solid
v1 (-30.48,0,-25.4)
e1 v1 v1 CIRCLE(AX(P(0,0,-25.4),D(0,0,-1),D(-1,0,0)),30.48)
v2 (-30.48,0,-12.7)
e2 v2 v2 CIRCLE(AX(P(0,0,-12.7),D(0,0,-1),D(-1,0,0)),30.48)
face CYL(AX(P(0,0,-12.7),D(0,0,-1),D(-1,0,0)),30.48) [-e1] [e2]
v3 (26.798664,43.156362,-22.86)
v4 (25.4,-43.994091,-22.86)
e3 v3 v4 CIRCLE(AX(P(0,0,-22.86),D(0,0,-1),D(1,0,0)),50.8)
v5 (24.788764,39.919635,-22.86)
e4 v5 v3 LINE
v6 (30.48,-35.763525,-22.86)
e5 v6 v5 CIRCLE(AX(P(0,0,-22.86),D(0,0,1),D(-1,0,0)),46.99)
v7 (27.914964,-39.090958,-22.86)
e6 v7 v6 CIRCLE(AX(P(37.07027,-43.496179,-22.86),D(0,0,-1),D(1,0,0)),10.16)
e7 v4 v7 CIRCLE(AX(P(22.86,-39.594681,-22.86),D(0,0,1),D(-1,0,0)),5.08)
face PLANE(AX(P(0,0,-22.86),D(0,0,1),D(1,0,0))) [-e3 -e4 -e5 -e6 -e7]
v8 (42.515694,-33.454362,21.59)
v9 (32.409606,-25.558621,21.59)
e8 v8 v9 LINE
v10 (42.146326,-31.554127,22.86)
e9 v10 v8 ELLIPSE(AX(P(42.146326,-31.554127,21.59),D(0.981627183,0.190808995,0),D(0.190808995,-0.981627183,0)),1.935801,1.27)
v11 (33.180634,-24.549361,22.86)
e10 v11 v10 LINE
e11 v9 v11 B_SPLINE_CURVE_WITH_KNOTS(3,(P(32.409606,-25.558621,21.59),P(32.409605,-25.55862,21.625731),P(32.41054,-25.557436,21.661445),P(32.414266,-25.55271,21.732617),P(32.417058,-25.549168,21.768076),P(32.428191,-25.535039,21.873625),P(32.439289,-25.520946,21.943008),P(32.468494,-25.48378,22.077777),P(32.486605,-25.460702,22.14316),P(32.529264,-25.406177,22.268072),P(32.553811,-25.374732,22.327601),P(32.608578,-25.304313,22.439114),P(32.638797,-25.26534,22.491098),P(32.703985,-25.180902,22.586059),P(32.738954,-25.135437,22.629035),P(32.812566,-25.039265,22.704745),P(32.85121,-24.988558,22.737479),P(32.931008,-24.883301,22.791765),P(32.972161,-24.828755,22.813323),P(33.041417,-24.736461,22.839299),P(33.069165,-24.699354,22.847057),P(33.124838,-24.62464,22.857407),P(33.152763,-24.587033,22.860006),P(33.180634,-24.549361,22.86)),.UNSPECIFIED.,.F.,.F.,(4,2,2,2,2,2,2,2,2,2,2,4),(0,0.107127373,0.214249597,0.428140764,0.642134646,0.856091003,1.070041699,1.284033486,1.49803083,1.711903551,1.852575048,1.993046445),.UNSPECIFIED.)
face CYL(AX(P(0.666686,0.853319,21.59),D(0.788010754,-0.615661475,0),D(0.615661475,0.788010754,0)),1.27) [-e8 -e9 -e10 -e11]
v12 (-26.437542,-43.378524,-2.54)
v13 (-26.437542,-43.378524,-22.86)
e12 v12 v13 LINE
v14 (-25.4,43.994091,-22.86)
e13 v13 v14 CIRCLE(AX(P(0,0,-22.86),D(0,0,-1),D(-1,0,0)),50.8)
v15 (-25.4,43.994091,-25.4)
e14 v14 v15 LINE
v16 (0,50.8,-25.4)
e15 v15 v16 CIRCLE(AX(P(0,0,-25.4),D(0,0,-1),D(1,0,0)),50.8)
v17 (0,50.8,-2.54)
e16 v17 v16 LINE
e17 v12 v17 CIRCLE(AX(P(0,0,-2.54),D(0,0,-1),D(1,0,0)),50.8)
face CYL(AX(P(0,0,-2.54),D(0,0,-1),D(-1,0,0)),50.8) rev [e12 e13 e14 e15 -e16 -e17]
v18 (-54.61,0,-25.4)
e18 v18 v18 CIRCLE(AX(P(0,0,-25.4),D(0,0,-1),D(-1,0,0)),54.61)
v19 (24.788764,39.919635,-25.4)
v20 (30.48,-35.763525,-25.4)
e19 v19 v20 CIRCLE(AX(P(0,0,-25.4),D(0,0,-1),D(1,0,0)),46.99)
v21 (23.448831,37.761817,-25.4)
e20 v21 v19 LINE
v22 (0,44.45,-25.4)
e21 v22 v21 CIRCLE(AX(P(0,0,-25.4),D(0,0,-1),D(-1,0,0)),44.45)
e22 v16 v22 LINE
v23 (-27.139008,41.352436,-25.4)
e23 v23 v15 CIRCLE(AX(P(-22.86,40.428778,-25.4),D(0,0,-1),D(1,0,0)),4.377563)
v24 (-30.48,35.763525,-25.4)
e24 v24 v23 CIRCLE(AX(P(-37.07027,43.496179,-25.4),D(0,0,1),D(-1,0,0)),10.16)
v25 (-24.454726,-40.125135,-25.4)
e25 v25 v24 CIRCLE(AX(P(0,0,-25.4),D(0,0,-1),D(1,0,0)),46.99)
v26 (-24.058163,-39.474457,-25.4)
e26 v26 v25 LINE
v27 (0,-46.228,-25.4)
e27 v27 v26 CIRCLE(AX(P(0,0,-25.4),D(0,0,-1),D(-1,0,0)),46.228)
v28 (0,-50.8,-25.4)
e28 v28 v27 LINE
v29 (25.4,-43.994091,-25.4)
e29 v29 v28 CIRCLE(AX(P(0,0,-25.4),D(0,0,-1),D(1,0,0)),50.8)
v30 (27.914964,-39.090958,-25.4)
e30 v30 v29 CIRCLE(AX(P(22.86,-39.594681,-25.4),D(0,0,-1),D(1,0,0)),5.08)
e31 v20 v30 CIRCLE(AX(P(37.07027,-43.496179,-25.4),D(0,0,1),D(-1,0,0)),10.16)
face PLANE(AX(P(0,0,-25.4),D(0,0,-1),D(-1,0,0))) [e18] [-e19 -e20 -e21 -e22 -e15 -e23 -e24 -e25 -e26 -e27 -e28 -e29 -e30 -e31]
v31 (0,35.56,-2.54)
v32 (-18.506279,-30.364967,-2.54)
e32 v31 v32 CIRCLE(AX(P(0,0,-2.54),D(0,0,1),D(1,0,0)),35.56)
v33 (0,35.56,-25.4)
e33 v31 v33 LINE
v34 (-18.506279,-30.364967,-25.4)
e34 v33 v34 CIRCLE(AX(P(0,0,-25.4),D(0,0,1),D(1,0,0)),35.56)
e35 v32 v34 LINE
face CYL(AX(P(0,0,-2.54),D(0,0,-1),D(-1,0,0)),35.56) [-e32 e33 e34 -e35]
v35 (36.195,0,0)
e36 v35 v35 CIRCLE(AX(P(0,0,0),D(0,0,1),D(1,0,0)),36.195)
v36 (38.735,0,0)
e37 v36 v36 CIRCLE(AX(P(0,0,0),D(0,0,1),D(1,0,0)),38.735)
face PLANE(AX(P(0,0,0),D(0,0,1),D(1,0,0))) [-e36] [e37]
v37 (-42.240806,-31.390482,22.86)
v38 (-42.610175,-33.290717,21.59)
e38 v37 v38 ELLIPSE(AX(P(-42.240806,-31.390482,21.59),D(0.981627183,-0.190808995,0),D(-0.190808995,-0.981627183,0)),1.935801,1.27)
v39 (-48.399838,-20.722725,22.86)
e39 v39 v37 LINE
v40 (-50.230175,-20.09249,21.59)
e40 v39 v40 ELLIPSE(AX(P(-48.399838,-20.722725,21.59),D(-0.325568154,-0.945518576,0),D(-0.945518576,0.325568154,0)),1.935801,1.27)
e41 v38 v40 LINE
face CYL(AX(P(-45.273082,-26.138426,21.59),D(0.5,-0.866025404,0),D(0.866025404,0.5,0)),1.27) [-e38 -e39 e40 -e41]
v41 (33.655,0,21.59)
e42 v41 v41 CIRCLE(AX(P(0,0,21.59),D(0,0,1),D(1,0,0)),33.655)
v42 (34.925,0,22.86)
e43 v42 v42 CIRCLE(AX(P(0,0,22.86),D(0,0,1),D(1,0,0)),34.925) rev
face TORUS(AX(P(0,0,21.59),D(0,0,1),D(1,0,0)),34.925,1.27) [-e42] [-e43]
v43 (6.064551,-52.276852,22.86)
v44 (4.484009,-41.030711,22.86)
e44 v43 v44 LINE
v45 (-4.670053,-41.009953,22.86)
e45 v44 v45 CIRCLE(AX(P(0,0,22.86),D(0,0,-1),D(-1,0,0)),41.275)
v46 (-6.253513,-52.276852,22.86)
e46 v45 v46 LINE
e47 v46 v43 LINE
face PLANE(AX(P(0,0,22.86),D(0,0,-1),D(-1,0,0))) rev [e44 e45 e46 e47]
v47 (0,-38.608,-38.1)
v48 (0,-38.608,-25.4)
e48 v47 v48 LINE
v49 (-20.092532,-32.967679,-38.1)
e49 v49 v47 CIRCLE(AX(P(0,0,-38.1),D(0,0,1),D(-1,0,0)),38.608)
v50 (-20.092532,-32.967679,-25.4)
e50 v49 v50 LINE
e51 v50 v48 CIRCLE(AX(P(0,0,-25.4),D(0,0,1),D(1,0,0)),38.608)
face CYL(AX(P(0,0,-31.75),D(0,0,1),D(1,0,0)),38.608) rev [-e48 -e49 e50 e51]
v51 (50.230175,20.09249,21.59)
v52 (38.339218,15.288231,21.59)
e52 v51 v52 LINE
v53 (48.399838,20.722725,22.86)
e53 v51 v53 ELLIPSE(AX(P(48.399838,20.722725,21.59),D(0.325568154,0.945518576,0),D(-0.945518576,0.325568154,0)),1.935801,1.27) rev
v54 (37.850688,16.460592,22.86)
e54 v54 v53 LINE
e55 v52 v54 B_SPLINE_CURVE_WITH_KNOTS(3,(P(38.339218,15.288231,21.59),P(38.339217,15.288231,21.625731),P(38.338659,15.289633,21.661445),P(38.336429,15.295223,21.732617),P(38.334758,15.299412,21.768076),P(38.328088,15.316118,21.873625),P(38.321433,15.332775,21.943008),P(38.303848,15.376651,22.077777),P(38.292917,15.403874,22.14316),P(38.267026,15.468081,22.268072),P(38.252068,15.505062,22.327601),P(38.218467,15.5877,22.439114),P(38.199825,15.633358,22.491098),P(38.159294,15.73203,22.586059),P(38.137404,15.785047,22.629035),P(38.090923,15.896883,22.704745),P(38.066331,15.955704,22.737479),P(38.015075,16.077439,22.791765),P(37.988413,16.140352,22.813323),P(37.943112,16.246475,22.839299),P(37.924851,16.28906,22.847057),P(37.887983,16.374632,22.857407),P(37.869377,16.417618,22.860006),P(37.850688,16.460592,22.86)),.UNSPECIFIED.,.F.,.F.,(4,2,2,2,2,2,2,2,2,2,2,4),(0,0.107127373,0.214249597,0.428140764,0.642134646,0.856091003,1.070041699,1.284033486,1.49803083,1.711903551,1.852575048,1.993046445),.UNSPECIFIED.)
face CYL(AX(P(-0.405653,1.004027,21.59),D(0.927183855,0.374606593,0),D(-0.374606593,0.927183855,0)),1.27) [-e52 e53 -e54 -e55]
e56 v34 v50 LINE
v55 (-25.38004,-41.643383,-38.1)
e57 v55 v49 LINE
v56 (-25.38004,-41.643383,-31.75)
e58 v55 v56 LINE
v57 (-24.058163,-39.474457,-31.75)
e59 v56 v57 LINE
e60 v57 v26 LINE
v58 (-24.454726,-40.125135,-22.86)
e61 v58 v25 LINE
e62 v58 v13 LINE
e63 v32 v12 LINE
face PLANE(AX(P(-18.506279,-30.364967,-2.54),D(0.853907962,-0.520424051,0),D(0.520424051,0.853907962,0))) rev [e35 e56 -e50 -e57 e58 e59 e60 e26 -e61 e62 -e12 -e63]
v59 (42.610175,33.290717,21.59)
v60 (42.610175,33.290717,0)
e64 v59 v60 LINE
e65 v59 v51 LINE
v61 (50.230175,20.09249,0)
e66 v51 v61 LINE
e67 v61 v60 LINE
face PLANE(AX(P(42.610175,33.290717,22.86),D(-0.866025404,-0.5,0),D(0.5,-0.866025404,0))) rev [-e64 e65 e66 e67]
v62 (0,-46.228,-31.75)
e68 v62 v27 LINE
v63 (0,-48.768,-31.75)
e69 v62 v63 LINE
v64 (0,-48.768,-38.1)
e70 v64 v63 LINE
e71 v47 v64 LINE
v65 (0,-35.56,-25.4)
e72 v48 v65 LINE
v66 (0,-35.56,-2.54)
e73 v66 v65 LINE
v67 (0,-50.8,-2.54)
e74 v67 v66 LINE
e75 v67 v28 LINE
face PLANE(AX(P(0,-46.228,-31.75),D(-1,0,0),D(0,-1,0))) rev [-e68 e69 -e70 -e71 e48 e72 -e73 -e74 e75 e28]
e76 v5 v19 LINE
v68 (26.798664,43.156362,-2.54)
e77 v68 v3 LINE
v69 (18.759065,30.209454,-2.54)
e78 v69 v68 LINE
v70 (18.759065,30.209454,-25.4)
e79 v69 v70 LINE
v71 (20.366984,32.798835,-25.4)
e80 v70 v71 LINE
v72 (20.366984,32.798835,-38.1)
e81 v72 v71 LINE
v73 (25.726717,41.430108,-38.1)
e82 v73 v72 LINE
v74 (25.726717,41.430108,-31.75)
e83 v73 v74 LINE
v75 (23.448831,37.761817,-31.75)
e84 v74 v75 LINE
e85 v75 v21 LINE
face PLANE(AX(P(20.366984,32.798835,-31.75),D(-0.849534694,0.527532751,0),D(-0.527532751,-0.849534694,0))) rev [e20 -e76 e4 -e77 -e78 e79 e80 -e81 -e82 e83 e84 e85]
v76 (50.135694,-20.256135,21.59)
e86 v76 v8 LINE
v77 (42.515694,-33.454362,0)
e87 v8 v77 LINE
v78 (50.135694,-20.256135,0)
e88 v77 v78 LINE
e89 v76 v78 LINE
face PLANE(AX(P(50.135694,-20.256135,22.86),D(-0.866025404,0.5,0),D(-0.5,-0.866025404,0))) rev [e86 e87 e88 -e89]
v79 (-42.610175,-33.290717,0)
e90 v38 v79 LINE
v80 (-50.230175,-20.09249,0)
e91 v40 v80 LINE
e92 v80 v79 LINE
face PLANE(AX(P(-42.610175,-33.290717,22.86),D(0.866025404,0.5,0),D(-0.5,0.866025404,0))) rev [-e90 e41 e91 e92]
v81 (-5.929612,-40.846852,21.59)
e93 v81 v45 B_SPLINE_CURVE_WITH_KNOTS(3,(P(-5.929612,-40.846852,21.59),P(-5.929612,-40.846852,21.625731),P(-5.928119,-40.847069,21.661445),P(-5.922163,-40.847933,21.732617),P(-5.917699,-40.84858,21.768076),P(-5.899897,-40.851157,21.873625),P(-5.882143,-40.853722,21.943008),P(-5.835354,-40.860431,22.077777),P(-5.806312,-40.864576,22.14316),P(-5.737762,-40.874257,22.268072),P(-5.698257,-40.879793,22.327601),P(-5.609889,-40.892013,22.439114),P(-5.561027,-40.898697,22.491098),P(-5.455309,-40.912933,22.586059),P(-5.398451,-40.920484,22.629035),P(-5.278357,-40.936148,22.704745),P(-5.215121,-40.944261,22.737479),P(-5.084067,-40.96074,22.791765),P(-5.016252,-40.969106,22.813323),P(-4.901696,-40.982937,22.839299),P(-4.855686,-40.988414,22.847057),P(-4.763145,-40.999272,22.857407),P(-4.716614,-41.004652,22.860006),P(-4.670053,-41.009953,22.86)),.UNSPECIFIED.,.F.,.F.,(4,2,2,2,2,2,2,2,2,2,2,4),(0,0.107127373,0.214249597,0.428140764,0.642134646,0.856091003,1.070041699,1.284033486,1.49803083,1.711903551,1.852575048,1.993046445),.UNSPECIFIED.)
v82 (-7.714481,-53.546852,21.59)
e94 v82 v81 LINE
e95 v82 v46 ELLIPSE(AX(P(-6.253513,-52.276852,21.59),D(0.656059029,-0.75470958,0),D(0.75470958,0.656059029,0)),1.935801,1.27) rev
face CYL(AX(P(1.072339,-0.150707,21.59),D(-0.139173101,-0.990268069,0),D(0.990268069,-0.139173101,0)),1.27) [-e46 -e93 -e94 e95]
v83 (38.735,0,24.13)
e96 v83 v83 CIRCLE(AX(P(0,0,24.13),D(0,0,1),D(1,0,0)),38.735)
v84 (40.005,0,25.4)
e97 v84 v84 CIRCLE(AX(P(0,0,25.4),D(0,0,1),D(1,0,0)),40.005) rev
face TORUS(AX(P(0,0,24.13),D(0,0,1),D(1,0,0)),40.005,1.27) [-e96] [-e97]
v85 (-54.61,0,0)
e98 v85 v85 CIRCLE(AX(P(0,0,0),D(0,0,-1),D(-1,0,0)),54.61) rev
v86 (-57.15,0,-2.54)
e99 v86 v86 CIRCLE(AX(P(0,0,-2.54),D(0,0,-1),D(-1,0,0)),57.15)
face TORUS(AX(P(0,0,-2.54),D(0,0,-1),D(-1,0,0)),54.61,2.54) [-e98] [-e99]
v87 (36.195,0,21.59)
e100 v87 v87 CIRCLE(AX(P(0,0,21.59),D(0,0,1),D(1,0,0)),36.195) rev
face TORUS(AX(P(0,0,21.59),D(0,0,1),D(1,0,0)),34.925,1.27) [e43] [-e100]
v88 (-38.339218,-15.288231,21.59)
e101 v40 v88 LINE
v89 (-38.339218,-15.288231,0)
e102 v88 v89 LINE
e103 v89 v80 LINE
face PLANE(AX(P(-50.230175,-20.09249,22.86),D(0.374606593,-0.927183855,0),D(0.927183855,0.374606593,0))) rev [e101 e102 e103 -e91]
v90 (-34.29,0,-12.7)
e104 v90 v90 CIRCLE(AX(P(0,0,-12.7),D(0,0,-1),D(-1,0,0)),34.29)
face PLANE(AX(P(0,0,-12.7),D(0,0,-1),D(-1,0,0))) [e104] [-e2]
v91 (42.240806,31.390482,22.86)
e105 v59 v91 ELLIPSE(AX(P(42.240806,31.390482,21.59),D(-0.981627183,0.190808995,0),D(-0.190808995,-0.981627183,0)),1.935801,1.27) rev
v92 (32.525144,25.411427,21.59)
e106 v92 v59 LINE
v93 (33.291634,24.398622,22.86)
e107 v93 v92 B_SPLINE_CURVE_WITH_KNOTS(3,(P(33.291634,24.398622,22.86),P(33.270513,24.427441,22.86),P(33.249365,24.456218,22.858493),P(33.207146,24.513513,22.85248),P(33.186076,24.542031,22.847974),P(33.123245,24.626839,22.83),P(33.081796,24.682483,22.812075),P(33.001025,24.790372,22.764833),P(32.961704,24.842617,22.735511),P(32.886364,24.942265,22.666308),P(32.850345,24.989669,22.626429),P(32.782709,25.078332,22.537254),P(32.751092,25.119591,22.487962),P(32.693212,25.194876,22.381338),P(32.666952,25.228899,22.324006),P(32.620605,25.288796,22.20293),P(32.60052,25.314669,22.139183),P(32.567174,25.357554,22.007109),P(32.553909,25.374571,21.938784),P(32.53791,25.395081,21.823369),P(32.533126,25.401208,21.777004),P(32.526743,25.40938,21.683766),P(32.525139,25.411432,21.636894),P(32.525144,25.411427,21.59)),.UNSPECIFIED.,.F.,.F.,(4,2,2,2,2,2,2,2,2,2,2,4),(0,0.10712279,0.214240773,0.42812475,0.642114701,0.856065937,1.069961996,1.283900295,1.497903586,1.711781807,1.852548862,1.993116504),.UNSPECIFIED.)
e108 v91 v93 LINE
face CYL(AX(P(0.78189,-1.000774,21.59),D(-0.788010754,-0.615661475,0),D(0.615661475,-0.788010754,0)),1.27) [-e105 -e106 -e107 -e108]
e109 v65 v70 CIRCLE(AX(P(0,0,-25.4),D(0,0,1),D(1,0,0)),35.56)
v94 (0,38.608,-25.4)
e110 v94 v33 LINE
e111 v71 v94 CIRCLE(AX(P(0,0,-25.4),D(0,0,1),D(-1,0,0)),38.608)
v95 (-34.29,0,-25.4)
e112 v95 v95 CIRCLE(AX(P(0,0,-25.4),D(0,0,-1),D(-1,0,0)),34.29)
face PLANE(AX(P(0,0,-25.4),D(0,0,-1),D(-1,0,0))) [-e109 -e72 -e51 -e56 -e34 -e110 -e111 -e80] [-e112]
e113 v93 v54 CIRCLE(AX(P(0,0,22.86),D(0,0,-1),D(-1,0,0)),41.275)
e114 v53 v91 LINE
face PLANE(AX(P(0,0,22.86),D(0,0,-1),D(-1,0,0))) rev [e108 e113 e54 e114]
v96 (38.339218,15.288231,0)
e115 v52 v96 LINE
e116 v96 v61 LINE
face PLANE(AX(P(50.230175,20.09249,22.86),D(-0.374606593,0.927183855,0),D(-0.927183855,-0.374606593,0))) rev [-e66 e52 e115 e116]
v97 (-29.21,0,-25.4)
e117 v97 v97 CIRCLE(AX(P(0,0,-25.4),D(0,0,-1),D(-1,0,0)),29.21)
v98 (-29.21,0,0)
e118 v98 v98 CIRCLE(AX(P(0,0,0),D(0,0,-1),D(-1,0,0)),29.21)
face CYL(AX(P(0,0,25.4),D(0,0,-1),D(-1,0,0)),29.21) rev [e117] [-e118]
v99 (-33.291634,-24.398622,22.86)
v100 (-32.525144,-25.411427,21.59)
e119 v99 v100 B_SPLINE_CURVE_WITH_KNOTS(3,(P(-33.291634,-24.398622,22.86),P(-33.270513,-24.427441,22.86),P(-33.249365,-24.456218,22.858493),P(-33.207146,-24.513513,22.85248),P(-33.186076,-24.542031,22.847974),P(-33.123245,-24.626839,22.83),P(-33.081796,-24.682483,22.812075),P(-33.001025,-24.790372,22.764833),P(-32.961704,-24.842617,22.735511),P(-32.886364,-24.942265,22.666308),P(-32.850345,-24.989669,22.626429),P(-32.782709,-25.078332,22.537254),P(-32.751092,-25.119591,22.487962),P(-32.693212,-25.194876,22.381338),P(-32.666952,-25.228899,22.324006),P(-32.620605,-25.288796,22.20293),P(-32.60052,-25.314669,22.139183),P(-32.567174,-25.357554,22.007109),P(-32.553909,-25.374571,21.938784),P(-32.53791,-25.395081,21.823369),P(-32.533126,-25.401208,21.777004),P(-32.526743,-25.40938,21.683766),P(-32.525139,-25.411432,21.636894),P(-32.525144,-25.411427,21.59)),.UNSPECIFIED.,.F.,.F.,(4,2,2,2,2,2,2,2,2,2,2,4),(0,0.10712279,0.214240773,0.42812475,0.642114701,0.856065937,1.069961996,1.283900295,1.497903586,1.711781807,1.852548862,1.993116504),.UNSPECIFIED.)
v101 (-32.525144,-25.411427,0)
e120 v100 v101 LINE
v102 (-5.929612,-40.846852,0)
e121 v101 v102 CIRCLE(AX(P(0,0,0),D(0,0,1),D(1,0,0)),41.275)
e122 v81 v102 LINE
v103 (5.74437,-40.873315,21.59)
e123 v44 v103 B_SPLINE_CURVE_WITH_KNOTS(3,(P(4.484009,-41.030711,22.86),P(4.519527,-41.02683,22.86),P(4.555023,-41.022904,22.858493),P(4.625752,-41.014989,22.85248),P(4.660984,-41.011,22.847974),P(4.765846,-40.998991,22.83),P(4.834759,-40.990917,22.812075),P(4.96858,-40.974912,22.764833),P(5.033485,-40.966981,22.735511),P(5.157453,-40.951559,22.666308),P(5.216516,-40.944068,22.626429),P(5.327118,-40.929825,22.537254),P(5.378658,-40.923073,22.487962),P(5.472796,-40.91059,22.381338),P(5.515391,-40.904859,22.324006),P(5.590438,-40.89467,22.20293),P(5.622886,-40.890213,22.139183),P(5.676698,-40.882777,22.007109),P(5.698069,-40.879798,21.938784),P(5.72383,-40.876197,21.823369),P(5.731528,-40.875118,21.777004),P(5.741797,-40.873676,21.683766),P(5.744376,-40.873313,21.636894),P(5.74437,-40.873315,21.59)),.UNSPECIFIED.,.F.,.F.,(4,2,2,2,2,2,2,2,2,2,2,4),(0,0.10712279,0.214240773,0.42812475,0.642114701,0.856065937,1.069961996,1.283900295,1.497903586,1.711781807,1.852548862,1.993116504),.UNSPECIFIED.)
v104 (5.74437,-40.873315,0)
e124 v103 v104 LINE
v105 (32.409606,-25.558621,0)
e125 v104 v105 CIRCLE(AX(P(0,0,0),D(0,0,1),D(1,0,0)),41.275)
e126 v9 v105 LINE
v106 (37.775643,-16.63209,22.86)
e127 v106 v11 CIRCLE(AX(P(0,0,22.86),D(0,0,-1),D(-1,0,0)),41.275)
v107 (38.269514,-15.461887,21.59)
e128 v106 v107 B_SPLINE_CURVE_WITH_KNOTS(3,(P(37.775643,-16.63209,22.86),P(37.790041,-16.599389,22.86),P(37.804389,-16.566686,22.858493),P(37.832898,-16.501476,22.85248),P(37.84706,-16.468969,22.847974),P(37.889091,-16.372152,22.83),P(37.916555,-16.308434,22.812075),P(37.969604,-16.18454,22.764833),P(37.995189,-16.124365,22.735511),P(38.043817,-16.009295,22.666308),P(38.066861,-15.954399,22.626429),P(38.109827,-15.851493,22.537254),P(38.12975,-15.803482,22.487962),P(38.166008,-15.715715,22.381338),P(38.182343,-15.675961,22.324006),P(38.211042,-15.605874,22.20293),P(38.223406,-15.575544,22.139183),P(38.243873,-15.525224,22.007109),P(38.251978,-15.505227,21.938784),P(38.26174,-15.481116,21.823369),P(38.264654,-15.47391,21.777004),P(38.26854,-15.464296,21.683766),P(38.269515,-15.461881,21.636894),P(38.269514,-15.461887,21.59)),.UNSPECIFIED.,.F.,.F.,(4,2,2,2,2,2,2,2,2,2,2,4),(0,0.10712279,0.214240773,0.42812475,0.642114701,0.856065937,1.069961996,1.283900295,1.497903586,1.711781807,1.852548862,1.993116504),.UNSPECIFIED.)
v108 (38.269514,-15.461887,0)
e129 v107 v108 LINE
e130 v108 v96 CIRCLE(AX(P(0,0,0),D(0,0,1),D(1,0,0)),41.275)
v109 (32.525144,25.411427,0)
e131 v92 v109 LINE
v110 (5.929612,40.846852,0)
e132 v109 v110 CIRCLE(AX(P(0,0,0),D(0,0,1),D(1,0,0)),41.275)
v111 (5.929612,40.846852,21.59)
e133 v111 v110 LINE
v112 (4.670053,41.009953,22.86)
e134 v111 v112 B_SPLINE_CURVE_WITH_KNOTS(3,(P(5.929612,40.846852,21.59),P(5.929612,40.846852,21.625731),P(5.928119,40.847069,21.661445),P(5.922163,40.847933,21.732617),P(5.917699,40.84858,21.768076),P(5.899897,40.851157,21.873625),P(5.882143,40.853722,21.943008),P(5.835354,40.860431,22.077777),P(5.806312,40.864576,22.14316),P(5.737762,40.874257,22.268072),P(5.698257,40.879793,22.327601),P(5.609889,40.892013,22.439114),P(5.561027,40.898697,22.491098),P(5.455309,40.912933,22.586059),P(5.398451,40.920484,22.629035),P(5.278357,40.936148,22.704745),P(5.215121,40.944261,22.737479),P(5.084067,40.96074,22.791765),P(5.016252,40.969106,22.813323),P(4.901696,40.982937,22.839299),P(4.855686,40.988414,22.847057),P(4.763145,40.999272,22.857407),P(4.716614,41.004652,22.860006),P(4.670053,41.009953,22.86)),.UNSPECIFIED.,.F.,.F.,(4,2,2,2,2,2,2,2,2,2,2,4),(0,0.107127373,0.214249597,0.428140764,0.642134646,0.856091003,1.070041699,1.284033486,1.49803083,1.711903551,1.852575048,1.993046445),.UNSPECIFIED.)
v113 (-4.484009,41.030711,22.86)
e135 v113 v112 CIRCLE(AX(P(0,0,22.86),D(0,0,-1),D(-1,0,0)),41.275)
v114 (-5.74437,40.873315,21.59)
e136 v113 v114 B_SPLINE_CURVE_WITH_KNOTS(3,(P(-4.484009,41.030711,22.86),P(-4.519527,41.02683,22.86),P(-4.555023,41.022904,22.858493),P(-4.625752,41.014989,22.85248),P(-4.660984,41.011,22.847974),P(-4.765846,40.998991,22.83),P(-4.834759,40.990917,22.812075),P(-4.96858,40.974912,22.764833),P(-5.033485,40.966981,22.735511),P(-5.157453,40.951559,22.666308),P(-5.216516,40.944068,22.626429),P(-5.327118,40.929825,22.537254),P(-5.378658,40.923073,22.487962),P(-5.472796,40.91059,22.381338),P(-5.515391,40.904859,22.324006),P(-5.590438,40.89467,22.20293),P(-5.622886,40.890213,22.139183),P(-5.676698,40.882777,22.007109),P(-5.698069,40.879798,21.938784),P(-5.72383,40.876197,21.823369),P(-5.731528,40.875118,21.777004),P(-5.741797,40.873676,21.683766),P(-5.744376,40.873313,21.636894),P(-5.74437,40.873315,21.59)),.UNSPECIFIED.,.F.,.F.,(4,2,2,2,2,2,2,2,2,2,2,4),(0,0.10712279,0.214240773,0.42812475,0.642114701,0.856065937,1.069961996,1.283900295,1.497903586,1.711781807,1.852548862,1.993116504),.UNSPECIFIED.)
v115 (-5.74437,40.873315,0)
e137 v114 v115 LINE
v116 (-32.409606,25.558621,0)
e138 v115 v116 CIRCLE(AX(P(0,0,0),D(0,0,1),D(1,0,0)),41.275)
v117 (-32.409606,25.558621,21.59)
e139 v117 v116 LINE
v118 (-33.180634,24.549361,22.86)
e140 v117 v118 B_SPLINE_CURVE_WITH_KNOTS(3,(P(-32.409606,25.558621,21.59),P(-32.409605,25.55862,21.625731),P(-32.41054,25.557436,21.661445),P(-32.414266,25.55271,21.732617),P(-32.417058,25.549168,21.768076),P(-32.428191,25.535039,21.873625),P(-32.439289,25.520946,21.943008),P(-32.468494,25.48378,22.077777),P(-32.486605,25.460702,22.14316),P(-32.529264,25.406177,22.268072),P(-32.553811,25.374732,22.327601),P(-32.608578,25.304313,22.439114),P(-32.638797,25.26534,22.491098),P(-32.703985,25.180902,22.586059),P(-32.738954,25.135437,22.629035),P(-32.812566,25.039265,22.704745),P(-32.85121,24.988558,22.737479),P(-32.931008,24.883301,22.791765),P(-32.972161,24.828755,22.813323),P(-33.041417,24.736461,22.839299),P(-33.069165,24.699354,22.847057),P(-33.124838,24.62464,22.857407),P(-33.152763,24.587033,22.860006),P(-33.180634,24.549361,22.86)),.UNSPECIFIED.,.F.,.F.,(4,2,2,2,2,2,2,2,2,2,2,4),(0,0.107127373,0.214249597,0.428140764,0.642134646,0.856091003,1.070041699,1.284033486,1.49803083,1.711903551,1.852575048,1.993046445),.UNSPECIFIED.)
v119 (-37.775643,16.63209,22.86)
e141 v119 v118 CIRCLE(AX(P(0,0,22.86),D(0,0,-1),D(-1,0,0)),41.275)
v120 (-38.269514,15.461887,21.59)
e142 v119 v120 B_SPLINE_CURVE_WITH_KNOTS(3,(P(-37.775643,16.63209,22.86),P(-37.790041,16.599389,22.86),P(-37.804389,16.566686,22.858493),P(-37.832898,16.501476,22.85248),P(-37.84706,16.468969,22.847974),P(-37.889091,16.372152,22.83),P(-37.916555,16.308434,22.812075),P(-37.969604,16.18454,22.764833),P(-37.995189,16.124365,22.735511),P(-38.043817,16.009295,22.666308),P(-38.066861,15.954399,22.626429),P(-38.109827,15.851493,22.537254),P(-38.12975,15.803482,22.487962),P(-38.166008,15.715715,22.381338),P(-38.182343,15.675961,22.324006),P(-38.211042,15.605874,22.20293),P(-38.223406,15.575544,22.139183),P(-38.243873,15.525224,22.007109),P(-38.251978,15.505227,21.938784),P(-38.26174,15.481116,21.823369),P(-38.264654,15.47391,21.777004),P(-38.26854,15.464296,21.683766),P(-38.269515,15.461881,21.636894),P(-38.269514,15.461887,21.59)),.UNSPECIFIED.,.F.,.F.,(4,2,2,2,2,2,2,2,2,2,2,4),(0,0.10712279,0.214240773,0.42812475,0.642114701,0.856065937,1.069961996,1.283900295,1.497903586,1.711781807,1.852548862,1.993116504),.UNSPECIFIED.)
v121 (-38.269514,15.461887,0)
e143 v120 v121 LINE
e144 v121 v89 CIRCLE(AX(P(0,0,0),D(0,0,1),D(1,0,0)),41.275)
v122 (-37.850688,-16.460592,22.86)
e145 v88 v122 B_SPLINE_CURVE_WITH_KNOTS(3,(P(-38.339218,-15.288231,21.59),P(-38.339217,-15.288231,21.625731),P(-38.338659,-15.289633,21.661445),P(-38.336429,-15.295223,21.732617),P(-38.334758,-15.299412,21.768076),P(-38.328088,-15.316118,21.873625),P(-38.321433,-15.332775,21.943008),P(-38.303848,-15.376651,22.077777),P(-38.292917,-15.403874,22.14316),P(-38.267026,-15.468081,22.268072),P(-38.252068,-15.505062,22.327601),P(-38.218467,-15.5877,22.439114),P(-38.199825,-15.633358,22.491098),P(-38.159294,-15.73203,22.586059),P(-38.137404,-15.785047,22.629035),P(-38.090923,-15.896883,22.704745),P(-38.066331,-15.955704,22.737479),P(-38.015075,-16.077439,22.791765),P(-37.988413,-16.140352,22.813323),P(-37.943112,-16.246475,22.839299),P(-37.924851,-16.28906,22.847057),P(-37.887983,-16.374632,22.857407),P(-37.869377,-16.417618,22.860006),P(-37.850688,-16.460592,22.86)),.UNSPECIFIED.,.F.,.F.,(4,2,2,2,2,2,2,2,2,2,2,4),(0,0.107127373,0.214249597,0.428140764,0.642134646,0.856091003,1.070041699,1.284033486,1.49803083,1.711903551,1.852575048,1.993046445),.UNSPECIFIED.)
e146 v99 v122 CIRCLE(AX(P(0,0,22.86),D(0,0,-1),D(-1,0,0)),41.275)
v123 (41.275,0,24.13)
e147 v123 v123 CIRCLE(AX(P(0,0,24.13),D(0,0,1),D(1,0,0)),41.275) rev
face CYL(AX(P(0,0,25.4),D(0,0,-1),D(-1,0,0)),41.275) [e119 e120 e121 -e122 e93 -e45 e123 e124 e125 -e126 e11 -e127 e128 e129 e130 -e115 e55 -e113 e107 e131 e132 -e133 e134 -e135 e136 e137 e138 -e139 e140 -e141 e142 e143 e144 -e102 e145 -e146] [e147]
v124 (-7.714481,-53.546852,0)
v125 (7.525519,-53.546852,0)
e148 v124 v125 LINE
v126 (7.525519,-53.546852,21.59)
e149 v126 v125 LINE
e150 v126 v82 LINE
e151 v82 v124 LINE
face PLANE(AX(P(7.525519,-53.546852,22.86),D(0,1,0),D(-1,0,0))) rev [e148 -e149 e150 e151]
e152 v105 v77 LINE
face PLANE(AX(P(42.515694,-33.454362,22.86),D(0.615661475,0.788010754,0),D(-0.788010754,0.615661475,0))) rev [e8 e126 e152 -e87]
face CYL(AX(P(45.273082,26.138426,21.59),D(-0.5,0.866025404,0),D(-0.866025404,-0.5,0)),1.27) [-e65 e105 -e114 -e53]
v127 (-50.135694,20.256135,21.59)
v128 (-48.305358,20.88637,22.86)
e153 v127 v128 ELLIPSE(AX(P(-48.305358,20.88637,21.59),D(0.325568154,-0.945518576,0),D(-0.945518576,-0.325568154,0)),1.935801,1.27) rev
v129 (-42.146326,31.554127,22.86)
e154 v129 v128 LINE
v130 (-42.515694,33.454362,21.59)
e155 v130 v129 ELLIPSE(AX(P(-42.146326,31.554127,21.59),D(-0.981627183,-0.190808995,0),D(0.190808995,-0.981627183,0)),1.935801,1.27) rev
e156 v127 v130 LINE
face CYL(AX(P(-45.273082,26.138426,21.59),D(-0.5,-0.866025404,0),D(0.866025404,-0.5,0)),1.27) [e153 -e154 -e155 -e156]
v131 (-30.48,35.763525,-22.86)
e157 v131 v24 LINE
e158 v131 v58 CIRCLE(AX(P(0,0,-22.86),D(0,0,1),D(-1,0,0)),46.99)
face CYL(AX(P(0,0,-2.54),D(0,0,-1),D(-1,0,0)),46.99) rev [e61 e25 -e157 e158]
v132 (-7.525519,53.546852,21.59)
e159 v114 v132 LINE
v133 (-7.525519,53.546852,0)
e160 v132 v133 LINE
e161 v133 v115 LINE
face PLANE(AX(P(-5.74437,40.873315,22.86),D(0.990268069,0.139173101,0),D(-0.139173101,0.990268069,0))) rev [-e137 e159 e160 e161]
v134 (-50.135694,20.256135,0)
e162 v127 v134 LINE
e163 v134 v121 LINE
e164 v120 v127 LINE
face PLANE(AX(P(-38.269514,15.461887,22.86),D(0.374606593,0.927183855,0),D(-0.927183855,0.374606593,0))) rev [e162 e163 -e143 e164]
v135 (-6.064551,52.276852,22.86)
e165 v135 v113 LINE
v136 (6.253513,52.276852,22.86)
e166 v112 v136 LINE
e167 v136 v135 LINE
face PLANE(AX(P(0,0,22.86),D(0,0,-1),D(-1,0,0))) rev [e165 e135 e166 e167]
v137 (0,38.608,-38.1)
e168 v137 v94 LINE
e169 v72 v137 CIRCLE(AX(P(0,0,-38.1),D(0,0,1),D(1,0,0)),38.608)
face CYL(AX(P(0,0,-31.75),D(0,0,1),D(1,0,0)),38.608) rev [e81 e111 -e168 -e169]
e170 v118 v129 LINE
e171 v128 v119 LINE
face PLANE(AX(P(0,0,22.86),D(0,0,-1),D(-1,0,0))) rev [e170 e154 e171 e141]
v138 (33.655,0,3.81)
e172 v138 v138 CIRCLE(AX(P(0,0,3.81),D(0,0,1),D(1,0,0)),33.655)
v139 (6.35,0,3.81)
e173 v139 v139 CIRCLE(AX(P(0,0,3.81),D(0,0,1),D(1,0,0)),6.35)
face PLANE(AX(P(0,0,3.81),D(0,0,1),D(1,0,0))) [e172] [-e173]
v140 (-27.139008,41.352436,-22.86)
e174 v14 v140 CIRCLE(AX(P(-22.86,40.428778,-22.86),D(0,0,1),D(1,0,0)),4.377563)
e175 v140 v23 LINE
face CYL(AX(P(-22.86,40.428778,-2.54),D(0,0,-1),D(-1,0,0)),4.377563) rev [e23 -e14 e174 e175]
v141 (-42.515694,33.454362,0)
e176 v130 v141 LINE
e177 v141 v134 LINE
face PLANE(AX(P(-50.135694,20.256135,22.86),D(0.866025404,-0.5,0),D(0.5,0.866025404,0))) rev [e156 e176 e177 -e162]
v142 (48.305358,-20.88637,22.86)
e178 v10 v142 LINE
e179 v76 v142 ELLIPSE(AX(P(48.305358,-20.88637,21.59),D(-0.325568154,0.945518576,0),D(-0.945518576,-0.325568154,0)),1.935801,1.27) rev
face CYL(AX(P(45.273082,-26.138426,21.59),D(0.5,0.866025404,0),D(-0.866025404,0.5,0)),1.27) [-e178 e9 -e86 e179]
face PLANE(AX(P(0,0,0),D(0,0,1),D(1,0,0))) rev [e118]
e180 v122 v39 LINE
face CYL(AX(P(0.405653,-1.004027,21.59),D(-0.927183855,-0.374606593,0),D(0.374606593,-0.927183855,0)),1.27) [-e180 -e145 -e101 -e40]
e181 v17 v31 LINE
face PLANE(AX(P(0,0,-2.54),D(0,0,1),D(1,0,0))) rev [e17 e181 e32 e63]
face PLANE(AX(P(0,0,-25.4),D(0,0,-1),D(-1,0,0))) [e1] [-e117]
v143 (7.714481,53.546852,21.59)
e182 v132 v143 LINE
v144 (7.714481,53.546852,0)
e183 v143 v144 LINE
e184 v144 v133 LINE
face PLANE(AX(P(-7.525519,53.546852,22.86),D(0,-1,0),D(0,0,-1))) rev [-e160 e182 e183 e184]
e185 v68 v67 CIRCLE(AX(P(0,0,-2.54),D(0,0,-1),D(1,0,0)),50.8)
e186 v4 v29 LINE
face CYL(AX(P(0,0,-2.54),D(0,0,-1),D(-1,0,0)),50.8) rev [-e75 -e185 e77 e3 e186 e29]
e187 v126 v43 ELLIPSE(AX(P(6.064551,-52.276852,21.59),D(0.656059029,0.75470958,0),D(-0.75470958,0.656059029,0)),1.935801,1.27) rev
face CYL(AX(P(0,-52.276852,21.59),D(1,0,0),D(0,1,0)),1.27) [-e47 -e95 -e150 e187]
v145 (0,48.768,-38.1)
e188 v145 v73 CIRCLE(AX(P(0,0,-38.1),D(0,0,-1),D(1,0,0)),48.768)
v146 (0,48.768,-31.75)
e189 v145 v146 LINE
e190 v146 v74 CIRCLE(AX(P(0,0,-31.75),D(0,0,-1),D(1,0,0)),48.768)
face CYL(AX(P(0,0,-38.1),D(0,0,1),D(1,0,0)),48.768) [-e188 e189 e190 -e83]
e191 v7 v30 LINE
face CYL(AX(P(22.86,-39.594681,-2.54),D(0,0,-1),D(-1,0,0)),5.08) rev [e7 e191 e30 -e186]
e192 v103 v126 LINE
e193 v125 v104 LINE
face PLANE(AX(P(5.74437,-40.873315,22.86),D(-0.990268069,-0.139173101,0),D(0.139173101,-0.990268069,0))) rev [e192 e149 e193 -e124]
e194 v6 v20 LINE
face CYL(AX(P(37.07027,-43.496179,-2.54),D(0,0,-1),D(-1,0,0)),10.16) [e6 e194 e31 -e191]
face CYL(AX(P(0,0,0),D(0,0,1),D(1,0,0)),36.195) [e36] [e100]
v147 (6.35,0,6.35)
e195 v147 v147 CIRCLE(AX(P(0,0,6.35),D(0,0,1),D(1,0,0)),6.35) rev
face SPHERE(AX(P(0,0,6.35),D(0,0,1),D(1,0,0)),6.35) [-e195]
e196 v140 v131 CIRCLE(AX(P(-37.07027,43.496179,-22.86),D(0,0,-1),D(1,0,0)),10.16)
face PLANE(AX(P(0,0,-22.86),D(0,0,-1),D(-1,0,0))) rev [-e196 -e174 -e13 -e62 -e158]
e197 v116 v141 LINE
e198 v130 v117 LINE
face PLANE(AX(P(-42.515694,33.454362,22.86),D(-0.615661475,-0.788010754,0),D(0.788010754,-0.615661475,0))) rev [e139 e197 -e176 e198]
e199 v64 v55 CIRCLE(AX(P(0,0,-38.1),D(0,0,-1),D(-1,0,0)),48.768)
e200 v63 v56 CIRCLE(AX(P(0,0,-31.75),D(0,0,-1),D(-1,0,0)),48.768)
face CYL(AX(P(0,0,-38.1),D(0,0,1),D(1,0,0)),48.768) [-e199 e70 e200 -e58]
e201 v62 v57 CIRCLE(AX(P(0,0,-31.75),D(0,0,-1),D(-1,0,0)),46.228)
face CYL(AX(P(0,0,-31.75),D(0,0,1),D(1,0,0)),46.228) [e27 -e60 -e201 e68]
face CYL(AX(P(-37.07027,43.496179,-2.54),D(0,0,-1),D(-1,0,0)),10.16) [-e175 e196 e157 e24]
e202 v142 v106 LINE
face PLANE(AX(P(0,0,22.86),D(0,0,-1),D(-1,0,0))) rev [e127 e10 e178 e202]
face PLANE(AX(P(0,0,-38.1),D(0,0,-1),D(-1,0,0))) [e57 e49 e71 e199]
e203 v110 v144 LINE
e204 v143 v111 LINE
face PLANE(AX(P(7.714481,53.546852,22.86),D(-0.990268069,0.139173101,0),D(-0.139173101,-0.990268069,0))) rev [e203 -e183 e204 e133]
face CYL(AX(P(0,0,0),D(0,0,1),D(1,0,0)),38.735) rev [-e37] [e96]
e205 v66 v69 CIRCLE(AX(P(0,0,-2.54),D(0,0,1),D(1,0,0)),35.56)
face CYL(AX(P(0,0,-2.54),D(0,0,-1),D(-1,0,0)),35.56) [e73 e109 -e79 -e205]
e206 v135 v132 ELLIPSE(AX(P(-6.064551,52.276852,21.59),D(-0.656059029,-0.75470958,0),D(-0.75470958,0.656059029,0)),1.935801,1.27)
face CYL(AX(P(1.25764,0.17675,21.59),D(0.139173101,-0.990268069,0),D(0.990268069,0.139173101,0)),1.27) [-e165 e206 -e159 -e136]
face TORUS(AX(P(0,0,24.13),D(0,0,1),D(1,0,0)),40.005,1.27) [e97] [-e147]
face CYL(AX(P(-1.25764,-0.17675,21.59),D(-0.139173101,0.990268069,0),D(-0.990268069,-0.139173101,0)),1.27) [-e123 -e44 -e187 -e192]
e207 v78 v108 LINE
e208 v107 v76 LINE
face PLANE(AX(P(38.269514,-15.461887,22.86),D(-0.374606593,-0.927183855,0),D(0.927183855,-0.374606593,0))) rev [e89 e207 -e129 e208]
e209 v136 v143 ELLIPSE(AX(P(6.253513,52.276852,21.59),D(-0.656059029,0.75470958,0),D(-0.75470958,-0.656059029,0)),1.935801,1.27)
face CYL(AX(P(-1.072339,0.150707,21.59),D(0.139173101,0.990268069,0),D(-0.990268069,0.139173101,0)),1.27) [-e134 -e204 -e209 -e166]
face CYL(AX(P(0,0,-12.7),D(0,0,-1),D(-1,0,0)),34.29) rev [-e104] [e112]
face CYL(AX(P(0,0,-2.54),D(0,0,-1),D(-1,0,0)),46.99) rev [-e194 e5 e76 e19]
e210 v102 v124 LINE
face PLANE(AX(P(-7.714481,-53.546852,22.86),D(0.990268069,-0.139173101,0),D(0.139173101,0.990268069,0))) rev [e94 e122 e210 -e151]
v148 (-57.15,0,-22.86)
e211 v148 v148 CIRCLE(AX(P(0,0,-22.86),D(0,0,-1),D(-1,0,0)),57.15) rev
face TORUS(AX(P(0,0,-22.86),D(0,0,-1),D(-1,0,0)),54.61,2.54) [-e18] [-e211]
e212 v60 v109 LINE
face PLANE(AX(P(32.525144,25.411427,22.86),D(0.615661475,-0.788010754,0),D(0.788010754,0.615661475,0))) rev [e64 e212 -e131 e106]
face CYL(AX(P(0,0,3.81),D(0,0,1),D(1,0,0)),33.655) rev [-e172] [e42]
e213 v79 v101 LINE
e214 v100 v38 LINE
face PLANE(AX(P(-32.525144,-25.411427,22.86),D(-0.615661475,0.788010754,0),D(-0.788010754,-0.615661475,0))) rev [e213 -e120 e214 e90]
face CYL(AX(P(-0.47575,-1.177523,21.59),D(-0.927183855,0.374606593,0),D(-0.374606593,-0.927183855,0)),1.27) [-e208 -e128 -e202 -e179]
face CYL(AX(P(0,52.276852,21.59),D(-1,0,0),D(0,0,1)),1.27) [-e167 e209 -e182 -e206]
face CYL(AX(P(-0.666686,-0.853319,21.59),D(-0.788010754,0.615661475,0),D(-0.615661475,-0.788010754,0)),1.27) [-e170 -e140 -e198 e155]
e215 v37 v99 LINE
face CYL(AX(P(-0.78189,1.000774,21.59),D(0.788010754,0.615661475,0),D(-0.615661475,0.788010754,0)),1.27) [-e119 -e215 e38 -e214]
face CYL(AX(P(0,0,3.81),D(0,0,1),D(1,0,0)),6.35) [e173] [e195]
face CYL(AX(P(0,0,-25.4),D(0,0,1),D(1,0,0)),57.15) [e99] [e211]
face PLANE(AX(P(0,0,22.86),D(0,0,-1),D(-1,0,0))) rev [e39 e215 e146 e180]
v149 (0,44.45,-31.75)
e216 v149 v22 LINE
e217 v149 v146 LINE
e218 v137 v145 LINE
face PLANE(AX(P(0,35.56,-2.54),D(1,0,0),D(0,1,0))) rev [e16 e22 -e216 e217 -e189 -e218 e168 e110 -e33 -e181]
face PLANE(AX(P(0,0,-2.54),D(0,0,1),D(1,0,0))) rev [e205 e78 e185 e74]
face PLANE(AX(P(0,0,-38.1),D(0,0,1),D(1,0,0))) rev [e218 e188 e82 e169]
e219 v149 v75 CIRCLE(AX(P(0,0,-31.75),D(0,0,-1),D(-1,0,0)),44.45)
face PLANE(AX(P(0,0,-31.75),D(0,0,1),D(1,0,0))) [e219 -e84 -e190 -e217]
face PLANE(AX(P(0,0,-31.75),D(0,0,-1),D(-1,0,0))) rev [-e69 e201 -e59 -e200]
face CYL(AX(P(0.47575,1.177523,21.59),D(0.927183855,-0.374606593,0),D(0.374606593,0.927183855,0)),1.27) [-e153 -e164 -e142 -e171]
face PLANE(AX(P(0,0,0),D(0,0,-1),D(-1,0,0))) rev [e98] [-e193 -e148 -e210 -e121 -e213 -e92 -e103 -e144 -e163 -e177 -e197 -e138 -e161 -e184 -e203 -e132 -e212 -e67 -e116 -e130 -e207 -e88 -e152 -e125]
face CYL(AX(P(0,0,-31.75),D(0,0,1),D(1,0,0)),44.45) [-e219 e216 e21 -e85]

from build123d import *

# Parameters (mm, degrees)
SKETCH1_R           = 41.275
BOSS_EXTRUDE1_DEPTH = 25.4
SKETCH2_R           = 36.068
CUT_EXTRUDE1_DEPTH  = 25.4
SKETCH3_R           = 57.15
BOSS_EXTRUDE2_DEPTH = 25.4
SKETCH4_R           = 29.21
CUT_EXTRUDE2_DEPTH  = 96.461432003
CUT_EXTRUDE4_DEPTH  = 22.86
CUT_EXTRUDE5_DEPTH  = 20.32
BOSS_EXTRUDE3_DEPTH = 6.35
BOSS_EXTRUDE4_DEPTH = 6.35
BOSS_EXTRUDE5_DEPTH = 6.35
BOSS_EXTRUDE6_DEPTH = 6.35
CUT_EXTRUDE6_DEPTH  = 22.86
CUT_EXTRUDE7_DEPTH  = 20.32
SKETCH15_R          = 34.29
SKETCH15_R_2        = 30.48
CUT_EXTRUDE8_DEPTH  = 12.7
FILLET1_R           = 2.54
BOSS_EXTRUDE7_START = -25.4
SKETCH16_R          = 41.275
BOSS_EXTRUDE7_DEPTH = 25.4
SKETCH17_R          = 38.735
SKETCH17_R_2        = 36.195
CUT_EXTRUDE9_DEPTH  = 25.4
SKETCH18_R          = 33.655
SKETCH18_R_2        = 6.35
CUT_EXTRUDE10_DEPTH = 21.59
SKETCH19_R          = 6.35
CUT_EXTRUDE11_DEPTH = 12.7
SKETCH20_R          = 36.195
SKETCH20_R_2        = 33.655
CUT_EXTRUDE12_DEPTH = 2.54
FILLET2_R           = 6.35
FILLET3_R           = 1.27
FILLET4_R           = 1.27
BOSS_EXTRUDE8_DEPTH = 22.86
FILLET5_R           = 1.27
FILLET6_R           = 2.54


with BuildPart() as part:
    # Sketch1 → Boss-Extrude1 (new body)
    with BuildSketch(Plane.XY):
        Circle(SKETCH1_R)
    extrude(amount=BOSS_EXTRUDE1_DEPTH)

    # Sketch2 → Cut-Extrude1 (cut)
    with BuildSketch(Plane.XY.offset(25.4)):
        Circle(SKETCH2_R)
    extrude(amount=-CUT_EXTRUDE1_DEPTH, mode=Mode.SUBTRACT)

    # Sketch3 → Boss-Extrude2 (add)
    with BuildSketch(Plane(origin=(0, 0, 0), x_dir=(-1, 0, 0), z_dir=(0, 0, -1))):
        Circle(SKETCH3_R)
    extrude(amount=BOSS_EXTRUDE2_DEPTH)

    # Sketch4 → Cut-Extrude2 (cut, through all)
    with BuildSketch(Plane(origin=(0, 0, -25.4), x_dir=(-1, 0, 0), z_dir=(0, 0, -1))):
        Circle(SKETCH4_R)
    extrude(amount=-CUT_EXTRUDE2_DEPTH, mode=Mode.SUBTRACT)

    # Sketch6 → Cut-Extrude4 (cut)
    with BuildSketch(Plane(origin=(0, 0, -25.4), x_dir=(-1, 0, 0), z_dir=(0, 0, -1))):
        with BuildLine():
            Line((18.506279238, -30.364967129), (24.454726136, -40.125135135))
            ThreePointArc((24.454726136, -40.125135135), (46.842589674, -3.719125253), (30.48, 35.763524714))
            ThreePointArc((30.48, 35.763524714), (28.349648711, 38.283083694), (27.139008157, 41.35243599))
            ThreePointArc((27.139008157, 41.35243599), (26.51640571, 42.835799248), (25.4, 43.994090512))
            ThreePointArc((25.4, 43.994090512), (13.148007491, 49.069031975), (0, 50.8))
            Line((0, 50.8), (0, 35.56))
            ThreePointArc((0, 35.56), (34.23661659, 9.610810811), (18.506279238, -30.364967129))
        make_face()
    extrude(amount=-CUT_EXTRUDE4_DEPTH, mode=Mode.SUBTRACT)

    # Sketch8 → Cut-Extrude5 (cut)
    with BuildSketch(Plane(origin=(0, 0, -22.86), x_dir=(-1, 0, 0), z_dir=(0, 0, -1))):
        with BuildLine():
            Line((26.437541769, -43.37852447), (24.454726136, -40.125135135))
            ThreePointArc((24.454726136, -40.125135135), (46.842589674, -3.719125253), (30.48, 35.763524714))
            ThreePointArc((30.48, 35.763524714), (28.349648711, 38.283083694), (27.139008157, 41.35243599))
            ThreePointArc((27.139008157, 41.35243599), (26.51640571, 42.835799248), (25.4, 43.994090512))
            ThreePointArc((25.4, 43.994090512), (50.796418637, 0.6032028), (26.437541769, -43.37852447))
        make_face()
    extrude(amount=-CUT_EXTRUDE5_DEPTH, mode=Mode.SUBTRACT)

    # Sketch9 → Boss-Extrude3 (add)
    with BuildSketch(Plane(origin=(0, 0, -25.4), x_dir=(-1, 0, 0), z_dir=(0, 0, -1))):
        with BuildLine():
            Line((0, 44.45), (0, 38.608))
            ThreePointArc((0, 38.608), (-10.589622857, 37.127315439), (-20.36698447, 32.798835461))
            Line((-20.36698447, 32.798835461), (-23.448830804, 37.761817143))
            ThreePointArc((-23.448830804, 37.761817143), (-12.192, 42.745264486), (0, 44.45))
        make_face()
    extrude(amount=BOSS_EXTRUDE3_DEPTH)

    # Sketch10 → Boss-Extrude4 (add)
    with BuildSketch(Plane(origin=(0, 0, -31.75), x_dir=(-1, 0, 0), z_dir=(0, 0, -1))):
        with BuildLine():
            Line((-20.36698447, 32.798835461), (-25.726717225, 41.430107951))
            ThreePointArc((-25.726717225, 41.430107951), (-13.376365714, 46.897661608), (0, 48.768))
            Line((0, 48.768), (0, 38.608))
            ThreePointArc((0, 38.608), (-10.589622857, 37.127315439), (-20.36698447, 32.798835461))
        make_face()
    extrude(amount=BOSS_EXTRUDE4_DEPTH)

    # Sketch11 → Boss-Extrude5 (add)
    with BuildSketch(Plane(origin=(0, 0, -25.4), x_dir=(-1, 0, 0), z_dir=(0, 0, -1))):
        with BuildLine():
            Line((0, -46.228), (0, -38.608))
            ThreePointArc((0, -38.608), (10.434594595, -37.171183727), (20.092531744, -32.967678598))
            Line((20.092531744, -32.967678598), (24.058163009, -39.474457268))
            ThreePointArc((24.058163009, -39.474457268), (12.494054054, -44.507601568), (0, -46.228))
        make_face()
    extrude(amount=BOSS_EXTRUDE5_DEPTH)

    # Sketch12 → Boss-Extrude6 (add)
    with BuildSketch(Plane(origin=(0, 0, -31.75), x_dir=(-1, 0, 0), z_dir=(0, 0, -1))):
        with BuildLine():
            Line((0, -38.608), (0, -48.768))
            ThreePointArc((0, -48.768), (13.180540541, -46.953074181), (25.380040098, -41.643383492))
            Line((25.380040098, -41.643383492), (20.092531744, -32.967678598))
            ThreePointArc((20.092531744, -32.967678598), (10.434594595, -37.171183727), (0, -38.608))
        make_face()
    extrude(amount=BOSS_EXTRUDE6_DEPTH)

    # Sketch13 → Cut-Extrude6 (cut)
    with BuildSketch(Plane(origin=(0, 0, -25.4), x_dir=(-1, 0, 0), z_dir=(0, 0, -1))):
        with BuildLine():
            Line((0, -35.56), (0, -50.8))
            ThreePointArc((0, -50.8), (-13.148007491, -49.069031975), (-25.4, -43.994090512))
            ThreePointArc((-25.4, -43.994090512), (-27.380071612, -41.913162133), (-27.914964156, -39.090957945))
            ThreePointArc((-27.914964156, -39.090957945), (-29.023609665, -37.293207394), (-30.48, -35.763524714))
            ThreePointArc((-30.48, -35.763524714), (-46.857702082, 3.52361399), (-24.788763993, 39.919635265))
            Line((-24.788763993, 39.919635265), (-18.759064643, 30.209453714))
            ThreePointArc((-18.759064643, 30.209453714), (-34.196211589, -9.7536), (0, -35.56))
        make_face()
    extrude(amount=-CUT_EXTRUDE6_DEPTH, mode=Mode.SUBTRACT)

    # Sketch14 → Cut-Extrude7 (cut)
    with BuildSketch(Plane(origin=(0, 0, -22.86), x_dir=(-1, 0, 0), z_dir=(0, 0, -1))):
        with BuildLine():
            Line((-26.798663776, 43.156362449), (-24.788763993, 39.919635265))
            ThreePointArc((-24.788763993, 39.919635265), (-46.857702082, 3.52361399), (-30.48, -35.763524714))
            ThreePointArc((-30.48, -35.763524714), (-29.023609665, -37.293207394), (-27.914964156, -39.090957945))
            ThreePointArc((-27.914964156, -39.090957945), (-27.380071612, -41.913162133), (-25.4, -43.994090512))
            ThreePointArc((-25.4, -43.994090512), (-50.793459105, -0.815176157), (-26.798663776, 43.156362449))
        make_face()
    extrude(amount=-CUT_EXTRUDE7_DEPTH, mode=Mode.SUBTRACT)

    # Sketch15 → Cut-Extrude8 (cut)
    with BuildSketch(Plane(origin=(0, 0, -25.4), x_dir=(-1, 0, 0), z_dir=(0, 0, -1))):
        Circle(SKETCH15_R)
        Circle(SKETCH15_R_2, mode=Mode.SUBTRACT)
    extrude(amount=-CUT_EXTRUDE8_DEPTH, mode=Mode.SUBTRACT)

    # Fillet1
    fillet1_edges = [part.edges().sort_by_distance(p)[0] for p in [
        (57.15, 0, -25.4),
    ]]
    fillet(fillet1_edges, radius=FILLET1_R)

    # Sketch16 → Boss-Extrude7 (add)
    with BuildSketch(Plane.XY.offset(25.4).offset(BOSS_EXTRUDE7_START)):
        Circle(SKETCH16_R)
    extrude(amount=BOSS_EXTRUDE7_DEPTH)

    # Sketch17 → Cut-Extrude9 (cut)
    with BuildSketch(Plane.XY.offset(25.4)):
        Circle(SKETCH17_R)
        Circle(SKETCH17_R_2, mode=Mode.SUBTRACT)
    extrude(amount=-CUT_EXTRUDE9_DEPTH, mode=Mode.SUBTRACT)

    # Sketch18 → Cut-Extrude10 (cut)
    with BuildSketch(Plane.XY.offset(25.4)):
        Circle(SKETCH18_R)
        Circle(SKETCH18_R_2, mode=Mode.SUBTRACT)
    extrude(amount=-CUT_EXTRUDE10_DEPTH, mode=Mode.SUBTRACT)

    # Sketch19 → Cut-Extrude11 (cut)
    with BuildSketch(Plane.XY.offset(25.4)):
        Circle(SKETCH19_R)
    extrude(amount=-CUT_EXTRUDE11_DEPTH, mode=Mode.SUBTRACT)

    # Sketch20 → Cut-Extrude12 (cut)
    with BuildSketch(Plane.XY.offset(25.4)):
        Circle(SKETCH20_R)
        Circle(SKETCH20_R_2, mode=Mode.SUBTRACT)
    extrude(amount=-CUT_EXTRUDE12_DEPTH, mode=Mode.SUBTRACT)

    # Fillet2
    fillet2_edges = [part.edges().sort_by_distance(p)[0] for p in [
        (-6.35, 0, 12.7),
    ]]
    fillet(fillet2_edges, radius=FILLET2_R)

    # Fillet3
    fillet3_edges = [part.edges().sort_by_distance(p)[0] for p in [
        (-36.195, 0, 22.86),
        (-33.655, 0, 22.86),
    ]]
    fillet(fillet3_edges, radius=FILLET3_R - 0.0001)  # a hair under: the kernel refuses the full size

    # Fillet4
    fillet4_edges = [part.edges().sort_by_distance(p)[0] for p in [
        (-38.735, 0, 25.4),
        (-41.275, 0, 25.4),
    ]]
    fillet(fillet4_edges, radius=FILLET4_R - 0.0001)  # a hair under: the kernel refuses the full size

    # Sketch21 → Boss-Extrude8 (add)
    with BuildSketch(Plane.XY):
        with BuildLine():
            Line((-5.744369742, 40.873314537), (-7.525519288, 53.546852084))
            Line((-7.525519288, 53.546852084), (7.714480712, 53.546852084))
            Line((7.714480712, 53.546852084), (5.929612112, 40.846852084))
            ThreePointArc((5.929612112, 40.846852084), (0.093561473, 41.274893958), (-5.744369742, 40.873314537))
        make_face()
        with BuildLine():
            Line((42.610174554, 33.290716922), (50.230174554, 20.092489768))
            Line((50.230174554, 20.092489768), (38.339217626, 15.288231319))
            ThreePointArc((38.339217626, 15.288231319), (35.791887443, 20.556420367), (32.525143855, 25.411427394))
            Line((32.525143855, 25.411427394), (42.610174554, 33.290716922))
        make_face()
        with BuildLine():
            Line((50.135693842, -20.256135162), (42.515693842, -33.454362316))
            Line((42.515693842, -33.454362316), (32.409605514, -25.558620765))
            ThreePointArc((32.409605514, -25.558620765), (35.69832597, -20.718473591), (38.269513597, -15.461887143))
            Line((38.269513597, -15.461887143), (50.135693842, -20.256135162))
        make_face()
        with BuildLine():
            Line((7.525519288, -53.546852084), (-7.714480712, -53.546852084))
            Line((-7.714480712, -53.546852084), (-5.929612112, -40.846852084))
            ThreePointArc((-5.929612112, -40.846852084), (-0.093561473, -41.274893958), (5.744369742, -40.873314537))
            Line((5.744369742, -40.873314537), (7.525519288, -53.546852084))
        make_face()
        with BuildLine():
            Line((-42.610174554, -33.290716922), (-50.230174554, -20.092489768))
            Line((-50.230174554, -20.092489768), (-38.339217626, -15.288231319))
            ThreePointArc((-38.339217626, -15.288231319), (-35.791887443, -20.556420367), (-32.525143855, -25.411427394))
            Line((-32.525143855, -25.411427394), (-42.610174554, -33.290716922))
        make_face()
        with BuildLine():
            Line((-50.135693842, 20.256135162), (-42.515693842, 33.454362316))
            Line((-42.515693842, 33.454362316), (-32.409605514, 25.558620765))
            ThreePointArc((-32.409605514, 25.558620765), (-35.69832597, 20.718473591), (-38.269513597, 15.461887143))
            Line((-38.269513597, 15.461887143), (-50.135693842, 20.256135162))
        make_face()
    extrude(amount=BOSS_EXTRUDE8_DEPTH)

    # Fillet5
    fillet5_edges = [part.edges().sort_by_distance(p)[0] for p in [
        (6.822046412, 47.196852084, 22.86),
        (0.094480712, 53.546852084, 22.86),
        (-6.634944515, 47.210083311, 22.86),
        (44.28469609, 17.690360544, 22.86),
        (46.420174554, 26.691603345, 22.86),
        (37.567659205, 29.351072158, 22.86),
        (37.462649678, -29.506491541, 22.86),
        (46.325693842, -26.855248739, 22.86),
        (44.202603719, -17.859011153, 22.86),
        (-6.822046412, -47.196852084, 22.86),
        (-0.094480712, -53.546852084, 22.86),
        (6.634944515, -47.210083311, 22.86),
        (-44.28469609, -17.690360544, 22.86),
        (-46.420174554, -26.691603345, 22.86),
        (-37.567659205, -29.351072158, 22.86),
        (-37.462649678, 29.506491541, 22.86),
        (-46.325693842, 26.855248739, 22.86),
        (-44.202603719, 17.859011153, 22.86),
    ]]
    fillet(fillet5_edges, radius=FILLET5_R)

    # Fillet6
    fillet6_edges = [part.edges().sort_by_distance(p)[0] for p in [
        (57.15, 0, 0),
    ]]
    fillet(fillet6_edges, radius=FILLET6_R)


solid = part.part
